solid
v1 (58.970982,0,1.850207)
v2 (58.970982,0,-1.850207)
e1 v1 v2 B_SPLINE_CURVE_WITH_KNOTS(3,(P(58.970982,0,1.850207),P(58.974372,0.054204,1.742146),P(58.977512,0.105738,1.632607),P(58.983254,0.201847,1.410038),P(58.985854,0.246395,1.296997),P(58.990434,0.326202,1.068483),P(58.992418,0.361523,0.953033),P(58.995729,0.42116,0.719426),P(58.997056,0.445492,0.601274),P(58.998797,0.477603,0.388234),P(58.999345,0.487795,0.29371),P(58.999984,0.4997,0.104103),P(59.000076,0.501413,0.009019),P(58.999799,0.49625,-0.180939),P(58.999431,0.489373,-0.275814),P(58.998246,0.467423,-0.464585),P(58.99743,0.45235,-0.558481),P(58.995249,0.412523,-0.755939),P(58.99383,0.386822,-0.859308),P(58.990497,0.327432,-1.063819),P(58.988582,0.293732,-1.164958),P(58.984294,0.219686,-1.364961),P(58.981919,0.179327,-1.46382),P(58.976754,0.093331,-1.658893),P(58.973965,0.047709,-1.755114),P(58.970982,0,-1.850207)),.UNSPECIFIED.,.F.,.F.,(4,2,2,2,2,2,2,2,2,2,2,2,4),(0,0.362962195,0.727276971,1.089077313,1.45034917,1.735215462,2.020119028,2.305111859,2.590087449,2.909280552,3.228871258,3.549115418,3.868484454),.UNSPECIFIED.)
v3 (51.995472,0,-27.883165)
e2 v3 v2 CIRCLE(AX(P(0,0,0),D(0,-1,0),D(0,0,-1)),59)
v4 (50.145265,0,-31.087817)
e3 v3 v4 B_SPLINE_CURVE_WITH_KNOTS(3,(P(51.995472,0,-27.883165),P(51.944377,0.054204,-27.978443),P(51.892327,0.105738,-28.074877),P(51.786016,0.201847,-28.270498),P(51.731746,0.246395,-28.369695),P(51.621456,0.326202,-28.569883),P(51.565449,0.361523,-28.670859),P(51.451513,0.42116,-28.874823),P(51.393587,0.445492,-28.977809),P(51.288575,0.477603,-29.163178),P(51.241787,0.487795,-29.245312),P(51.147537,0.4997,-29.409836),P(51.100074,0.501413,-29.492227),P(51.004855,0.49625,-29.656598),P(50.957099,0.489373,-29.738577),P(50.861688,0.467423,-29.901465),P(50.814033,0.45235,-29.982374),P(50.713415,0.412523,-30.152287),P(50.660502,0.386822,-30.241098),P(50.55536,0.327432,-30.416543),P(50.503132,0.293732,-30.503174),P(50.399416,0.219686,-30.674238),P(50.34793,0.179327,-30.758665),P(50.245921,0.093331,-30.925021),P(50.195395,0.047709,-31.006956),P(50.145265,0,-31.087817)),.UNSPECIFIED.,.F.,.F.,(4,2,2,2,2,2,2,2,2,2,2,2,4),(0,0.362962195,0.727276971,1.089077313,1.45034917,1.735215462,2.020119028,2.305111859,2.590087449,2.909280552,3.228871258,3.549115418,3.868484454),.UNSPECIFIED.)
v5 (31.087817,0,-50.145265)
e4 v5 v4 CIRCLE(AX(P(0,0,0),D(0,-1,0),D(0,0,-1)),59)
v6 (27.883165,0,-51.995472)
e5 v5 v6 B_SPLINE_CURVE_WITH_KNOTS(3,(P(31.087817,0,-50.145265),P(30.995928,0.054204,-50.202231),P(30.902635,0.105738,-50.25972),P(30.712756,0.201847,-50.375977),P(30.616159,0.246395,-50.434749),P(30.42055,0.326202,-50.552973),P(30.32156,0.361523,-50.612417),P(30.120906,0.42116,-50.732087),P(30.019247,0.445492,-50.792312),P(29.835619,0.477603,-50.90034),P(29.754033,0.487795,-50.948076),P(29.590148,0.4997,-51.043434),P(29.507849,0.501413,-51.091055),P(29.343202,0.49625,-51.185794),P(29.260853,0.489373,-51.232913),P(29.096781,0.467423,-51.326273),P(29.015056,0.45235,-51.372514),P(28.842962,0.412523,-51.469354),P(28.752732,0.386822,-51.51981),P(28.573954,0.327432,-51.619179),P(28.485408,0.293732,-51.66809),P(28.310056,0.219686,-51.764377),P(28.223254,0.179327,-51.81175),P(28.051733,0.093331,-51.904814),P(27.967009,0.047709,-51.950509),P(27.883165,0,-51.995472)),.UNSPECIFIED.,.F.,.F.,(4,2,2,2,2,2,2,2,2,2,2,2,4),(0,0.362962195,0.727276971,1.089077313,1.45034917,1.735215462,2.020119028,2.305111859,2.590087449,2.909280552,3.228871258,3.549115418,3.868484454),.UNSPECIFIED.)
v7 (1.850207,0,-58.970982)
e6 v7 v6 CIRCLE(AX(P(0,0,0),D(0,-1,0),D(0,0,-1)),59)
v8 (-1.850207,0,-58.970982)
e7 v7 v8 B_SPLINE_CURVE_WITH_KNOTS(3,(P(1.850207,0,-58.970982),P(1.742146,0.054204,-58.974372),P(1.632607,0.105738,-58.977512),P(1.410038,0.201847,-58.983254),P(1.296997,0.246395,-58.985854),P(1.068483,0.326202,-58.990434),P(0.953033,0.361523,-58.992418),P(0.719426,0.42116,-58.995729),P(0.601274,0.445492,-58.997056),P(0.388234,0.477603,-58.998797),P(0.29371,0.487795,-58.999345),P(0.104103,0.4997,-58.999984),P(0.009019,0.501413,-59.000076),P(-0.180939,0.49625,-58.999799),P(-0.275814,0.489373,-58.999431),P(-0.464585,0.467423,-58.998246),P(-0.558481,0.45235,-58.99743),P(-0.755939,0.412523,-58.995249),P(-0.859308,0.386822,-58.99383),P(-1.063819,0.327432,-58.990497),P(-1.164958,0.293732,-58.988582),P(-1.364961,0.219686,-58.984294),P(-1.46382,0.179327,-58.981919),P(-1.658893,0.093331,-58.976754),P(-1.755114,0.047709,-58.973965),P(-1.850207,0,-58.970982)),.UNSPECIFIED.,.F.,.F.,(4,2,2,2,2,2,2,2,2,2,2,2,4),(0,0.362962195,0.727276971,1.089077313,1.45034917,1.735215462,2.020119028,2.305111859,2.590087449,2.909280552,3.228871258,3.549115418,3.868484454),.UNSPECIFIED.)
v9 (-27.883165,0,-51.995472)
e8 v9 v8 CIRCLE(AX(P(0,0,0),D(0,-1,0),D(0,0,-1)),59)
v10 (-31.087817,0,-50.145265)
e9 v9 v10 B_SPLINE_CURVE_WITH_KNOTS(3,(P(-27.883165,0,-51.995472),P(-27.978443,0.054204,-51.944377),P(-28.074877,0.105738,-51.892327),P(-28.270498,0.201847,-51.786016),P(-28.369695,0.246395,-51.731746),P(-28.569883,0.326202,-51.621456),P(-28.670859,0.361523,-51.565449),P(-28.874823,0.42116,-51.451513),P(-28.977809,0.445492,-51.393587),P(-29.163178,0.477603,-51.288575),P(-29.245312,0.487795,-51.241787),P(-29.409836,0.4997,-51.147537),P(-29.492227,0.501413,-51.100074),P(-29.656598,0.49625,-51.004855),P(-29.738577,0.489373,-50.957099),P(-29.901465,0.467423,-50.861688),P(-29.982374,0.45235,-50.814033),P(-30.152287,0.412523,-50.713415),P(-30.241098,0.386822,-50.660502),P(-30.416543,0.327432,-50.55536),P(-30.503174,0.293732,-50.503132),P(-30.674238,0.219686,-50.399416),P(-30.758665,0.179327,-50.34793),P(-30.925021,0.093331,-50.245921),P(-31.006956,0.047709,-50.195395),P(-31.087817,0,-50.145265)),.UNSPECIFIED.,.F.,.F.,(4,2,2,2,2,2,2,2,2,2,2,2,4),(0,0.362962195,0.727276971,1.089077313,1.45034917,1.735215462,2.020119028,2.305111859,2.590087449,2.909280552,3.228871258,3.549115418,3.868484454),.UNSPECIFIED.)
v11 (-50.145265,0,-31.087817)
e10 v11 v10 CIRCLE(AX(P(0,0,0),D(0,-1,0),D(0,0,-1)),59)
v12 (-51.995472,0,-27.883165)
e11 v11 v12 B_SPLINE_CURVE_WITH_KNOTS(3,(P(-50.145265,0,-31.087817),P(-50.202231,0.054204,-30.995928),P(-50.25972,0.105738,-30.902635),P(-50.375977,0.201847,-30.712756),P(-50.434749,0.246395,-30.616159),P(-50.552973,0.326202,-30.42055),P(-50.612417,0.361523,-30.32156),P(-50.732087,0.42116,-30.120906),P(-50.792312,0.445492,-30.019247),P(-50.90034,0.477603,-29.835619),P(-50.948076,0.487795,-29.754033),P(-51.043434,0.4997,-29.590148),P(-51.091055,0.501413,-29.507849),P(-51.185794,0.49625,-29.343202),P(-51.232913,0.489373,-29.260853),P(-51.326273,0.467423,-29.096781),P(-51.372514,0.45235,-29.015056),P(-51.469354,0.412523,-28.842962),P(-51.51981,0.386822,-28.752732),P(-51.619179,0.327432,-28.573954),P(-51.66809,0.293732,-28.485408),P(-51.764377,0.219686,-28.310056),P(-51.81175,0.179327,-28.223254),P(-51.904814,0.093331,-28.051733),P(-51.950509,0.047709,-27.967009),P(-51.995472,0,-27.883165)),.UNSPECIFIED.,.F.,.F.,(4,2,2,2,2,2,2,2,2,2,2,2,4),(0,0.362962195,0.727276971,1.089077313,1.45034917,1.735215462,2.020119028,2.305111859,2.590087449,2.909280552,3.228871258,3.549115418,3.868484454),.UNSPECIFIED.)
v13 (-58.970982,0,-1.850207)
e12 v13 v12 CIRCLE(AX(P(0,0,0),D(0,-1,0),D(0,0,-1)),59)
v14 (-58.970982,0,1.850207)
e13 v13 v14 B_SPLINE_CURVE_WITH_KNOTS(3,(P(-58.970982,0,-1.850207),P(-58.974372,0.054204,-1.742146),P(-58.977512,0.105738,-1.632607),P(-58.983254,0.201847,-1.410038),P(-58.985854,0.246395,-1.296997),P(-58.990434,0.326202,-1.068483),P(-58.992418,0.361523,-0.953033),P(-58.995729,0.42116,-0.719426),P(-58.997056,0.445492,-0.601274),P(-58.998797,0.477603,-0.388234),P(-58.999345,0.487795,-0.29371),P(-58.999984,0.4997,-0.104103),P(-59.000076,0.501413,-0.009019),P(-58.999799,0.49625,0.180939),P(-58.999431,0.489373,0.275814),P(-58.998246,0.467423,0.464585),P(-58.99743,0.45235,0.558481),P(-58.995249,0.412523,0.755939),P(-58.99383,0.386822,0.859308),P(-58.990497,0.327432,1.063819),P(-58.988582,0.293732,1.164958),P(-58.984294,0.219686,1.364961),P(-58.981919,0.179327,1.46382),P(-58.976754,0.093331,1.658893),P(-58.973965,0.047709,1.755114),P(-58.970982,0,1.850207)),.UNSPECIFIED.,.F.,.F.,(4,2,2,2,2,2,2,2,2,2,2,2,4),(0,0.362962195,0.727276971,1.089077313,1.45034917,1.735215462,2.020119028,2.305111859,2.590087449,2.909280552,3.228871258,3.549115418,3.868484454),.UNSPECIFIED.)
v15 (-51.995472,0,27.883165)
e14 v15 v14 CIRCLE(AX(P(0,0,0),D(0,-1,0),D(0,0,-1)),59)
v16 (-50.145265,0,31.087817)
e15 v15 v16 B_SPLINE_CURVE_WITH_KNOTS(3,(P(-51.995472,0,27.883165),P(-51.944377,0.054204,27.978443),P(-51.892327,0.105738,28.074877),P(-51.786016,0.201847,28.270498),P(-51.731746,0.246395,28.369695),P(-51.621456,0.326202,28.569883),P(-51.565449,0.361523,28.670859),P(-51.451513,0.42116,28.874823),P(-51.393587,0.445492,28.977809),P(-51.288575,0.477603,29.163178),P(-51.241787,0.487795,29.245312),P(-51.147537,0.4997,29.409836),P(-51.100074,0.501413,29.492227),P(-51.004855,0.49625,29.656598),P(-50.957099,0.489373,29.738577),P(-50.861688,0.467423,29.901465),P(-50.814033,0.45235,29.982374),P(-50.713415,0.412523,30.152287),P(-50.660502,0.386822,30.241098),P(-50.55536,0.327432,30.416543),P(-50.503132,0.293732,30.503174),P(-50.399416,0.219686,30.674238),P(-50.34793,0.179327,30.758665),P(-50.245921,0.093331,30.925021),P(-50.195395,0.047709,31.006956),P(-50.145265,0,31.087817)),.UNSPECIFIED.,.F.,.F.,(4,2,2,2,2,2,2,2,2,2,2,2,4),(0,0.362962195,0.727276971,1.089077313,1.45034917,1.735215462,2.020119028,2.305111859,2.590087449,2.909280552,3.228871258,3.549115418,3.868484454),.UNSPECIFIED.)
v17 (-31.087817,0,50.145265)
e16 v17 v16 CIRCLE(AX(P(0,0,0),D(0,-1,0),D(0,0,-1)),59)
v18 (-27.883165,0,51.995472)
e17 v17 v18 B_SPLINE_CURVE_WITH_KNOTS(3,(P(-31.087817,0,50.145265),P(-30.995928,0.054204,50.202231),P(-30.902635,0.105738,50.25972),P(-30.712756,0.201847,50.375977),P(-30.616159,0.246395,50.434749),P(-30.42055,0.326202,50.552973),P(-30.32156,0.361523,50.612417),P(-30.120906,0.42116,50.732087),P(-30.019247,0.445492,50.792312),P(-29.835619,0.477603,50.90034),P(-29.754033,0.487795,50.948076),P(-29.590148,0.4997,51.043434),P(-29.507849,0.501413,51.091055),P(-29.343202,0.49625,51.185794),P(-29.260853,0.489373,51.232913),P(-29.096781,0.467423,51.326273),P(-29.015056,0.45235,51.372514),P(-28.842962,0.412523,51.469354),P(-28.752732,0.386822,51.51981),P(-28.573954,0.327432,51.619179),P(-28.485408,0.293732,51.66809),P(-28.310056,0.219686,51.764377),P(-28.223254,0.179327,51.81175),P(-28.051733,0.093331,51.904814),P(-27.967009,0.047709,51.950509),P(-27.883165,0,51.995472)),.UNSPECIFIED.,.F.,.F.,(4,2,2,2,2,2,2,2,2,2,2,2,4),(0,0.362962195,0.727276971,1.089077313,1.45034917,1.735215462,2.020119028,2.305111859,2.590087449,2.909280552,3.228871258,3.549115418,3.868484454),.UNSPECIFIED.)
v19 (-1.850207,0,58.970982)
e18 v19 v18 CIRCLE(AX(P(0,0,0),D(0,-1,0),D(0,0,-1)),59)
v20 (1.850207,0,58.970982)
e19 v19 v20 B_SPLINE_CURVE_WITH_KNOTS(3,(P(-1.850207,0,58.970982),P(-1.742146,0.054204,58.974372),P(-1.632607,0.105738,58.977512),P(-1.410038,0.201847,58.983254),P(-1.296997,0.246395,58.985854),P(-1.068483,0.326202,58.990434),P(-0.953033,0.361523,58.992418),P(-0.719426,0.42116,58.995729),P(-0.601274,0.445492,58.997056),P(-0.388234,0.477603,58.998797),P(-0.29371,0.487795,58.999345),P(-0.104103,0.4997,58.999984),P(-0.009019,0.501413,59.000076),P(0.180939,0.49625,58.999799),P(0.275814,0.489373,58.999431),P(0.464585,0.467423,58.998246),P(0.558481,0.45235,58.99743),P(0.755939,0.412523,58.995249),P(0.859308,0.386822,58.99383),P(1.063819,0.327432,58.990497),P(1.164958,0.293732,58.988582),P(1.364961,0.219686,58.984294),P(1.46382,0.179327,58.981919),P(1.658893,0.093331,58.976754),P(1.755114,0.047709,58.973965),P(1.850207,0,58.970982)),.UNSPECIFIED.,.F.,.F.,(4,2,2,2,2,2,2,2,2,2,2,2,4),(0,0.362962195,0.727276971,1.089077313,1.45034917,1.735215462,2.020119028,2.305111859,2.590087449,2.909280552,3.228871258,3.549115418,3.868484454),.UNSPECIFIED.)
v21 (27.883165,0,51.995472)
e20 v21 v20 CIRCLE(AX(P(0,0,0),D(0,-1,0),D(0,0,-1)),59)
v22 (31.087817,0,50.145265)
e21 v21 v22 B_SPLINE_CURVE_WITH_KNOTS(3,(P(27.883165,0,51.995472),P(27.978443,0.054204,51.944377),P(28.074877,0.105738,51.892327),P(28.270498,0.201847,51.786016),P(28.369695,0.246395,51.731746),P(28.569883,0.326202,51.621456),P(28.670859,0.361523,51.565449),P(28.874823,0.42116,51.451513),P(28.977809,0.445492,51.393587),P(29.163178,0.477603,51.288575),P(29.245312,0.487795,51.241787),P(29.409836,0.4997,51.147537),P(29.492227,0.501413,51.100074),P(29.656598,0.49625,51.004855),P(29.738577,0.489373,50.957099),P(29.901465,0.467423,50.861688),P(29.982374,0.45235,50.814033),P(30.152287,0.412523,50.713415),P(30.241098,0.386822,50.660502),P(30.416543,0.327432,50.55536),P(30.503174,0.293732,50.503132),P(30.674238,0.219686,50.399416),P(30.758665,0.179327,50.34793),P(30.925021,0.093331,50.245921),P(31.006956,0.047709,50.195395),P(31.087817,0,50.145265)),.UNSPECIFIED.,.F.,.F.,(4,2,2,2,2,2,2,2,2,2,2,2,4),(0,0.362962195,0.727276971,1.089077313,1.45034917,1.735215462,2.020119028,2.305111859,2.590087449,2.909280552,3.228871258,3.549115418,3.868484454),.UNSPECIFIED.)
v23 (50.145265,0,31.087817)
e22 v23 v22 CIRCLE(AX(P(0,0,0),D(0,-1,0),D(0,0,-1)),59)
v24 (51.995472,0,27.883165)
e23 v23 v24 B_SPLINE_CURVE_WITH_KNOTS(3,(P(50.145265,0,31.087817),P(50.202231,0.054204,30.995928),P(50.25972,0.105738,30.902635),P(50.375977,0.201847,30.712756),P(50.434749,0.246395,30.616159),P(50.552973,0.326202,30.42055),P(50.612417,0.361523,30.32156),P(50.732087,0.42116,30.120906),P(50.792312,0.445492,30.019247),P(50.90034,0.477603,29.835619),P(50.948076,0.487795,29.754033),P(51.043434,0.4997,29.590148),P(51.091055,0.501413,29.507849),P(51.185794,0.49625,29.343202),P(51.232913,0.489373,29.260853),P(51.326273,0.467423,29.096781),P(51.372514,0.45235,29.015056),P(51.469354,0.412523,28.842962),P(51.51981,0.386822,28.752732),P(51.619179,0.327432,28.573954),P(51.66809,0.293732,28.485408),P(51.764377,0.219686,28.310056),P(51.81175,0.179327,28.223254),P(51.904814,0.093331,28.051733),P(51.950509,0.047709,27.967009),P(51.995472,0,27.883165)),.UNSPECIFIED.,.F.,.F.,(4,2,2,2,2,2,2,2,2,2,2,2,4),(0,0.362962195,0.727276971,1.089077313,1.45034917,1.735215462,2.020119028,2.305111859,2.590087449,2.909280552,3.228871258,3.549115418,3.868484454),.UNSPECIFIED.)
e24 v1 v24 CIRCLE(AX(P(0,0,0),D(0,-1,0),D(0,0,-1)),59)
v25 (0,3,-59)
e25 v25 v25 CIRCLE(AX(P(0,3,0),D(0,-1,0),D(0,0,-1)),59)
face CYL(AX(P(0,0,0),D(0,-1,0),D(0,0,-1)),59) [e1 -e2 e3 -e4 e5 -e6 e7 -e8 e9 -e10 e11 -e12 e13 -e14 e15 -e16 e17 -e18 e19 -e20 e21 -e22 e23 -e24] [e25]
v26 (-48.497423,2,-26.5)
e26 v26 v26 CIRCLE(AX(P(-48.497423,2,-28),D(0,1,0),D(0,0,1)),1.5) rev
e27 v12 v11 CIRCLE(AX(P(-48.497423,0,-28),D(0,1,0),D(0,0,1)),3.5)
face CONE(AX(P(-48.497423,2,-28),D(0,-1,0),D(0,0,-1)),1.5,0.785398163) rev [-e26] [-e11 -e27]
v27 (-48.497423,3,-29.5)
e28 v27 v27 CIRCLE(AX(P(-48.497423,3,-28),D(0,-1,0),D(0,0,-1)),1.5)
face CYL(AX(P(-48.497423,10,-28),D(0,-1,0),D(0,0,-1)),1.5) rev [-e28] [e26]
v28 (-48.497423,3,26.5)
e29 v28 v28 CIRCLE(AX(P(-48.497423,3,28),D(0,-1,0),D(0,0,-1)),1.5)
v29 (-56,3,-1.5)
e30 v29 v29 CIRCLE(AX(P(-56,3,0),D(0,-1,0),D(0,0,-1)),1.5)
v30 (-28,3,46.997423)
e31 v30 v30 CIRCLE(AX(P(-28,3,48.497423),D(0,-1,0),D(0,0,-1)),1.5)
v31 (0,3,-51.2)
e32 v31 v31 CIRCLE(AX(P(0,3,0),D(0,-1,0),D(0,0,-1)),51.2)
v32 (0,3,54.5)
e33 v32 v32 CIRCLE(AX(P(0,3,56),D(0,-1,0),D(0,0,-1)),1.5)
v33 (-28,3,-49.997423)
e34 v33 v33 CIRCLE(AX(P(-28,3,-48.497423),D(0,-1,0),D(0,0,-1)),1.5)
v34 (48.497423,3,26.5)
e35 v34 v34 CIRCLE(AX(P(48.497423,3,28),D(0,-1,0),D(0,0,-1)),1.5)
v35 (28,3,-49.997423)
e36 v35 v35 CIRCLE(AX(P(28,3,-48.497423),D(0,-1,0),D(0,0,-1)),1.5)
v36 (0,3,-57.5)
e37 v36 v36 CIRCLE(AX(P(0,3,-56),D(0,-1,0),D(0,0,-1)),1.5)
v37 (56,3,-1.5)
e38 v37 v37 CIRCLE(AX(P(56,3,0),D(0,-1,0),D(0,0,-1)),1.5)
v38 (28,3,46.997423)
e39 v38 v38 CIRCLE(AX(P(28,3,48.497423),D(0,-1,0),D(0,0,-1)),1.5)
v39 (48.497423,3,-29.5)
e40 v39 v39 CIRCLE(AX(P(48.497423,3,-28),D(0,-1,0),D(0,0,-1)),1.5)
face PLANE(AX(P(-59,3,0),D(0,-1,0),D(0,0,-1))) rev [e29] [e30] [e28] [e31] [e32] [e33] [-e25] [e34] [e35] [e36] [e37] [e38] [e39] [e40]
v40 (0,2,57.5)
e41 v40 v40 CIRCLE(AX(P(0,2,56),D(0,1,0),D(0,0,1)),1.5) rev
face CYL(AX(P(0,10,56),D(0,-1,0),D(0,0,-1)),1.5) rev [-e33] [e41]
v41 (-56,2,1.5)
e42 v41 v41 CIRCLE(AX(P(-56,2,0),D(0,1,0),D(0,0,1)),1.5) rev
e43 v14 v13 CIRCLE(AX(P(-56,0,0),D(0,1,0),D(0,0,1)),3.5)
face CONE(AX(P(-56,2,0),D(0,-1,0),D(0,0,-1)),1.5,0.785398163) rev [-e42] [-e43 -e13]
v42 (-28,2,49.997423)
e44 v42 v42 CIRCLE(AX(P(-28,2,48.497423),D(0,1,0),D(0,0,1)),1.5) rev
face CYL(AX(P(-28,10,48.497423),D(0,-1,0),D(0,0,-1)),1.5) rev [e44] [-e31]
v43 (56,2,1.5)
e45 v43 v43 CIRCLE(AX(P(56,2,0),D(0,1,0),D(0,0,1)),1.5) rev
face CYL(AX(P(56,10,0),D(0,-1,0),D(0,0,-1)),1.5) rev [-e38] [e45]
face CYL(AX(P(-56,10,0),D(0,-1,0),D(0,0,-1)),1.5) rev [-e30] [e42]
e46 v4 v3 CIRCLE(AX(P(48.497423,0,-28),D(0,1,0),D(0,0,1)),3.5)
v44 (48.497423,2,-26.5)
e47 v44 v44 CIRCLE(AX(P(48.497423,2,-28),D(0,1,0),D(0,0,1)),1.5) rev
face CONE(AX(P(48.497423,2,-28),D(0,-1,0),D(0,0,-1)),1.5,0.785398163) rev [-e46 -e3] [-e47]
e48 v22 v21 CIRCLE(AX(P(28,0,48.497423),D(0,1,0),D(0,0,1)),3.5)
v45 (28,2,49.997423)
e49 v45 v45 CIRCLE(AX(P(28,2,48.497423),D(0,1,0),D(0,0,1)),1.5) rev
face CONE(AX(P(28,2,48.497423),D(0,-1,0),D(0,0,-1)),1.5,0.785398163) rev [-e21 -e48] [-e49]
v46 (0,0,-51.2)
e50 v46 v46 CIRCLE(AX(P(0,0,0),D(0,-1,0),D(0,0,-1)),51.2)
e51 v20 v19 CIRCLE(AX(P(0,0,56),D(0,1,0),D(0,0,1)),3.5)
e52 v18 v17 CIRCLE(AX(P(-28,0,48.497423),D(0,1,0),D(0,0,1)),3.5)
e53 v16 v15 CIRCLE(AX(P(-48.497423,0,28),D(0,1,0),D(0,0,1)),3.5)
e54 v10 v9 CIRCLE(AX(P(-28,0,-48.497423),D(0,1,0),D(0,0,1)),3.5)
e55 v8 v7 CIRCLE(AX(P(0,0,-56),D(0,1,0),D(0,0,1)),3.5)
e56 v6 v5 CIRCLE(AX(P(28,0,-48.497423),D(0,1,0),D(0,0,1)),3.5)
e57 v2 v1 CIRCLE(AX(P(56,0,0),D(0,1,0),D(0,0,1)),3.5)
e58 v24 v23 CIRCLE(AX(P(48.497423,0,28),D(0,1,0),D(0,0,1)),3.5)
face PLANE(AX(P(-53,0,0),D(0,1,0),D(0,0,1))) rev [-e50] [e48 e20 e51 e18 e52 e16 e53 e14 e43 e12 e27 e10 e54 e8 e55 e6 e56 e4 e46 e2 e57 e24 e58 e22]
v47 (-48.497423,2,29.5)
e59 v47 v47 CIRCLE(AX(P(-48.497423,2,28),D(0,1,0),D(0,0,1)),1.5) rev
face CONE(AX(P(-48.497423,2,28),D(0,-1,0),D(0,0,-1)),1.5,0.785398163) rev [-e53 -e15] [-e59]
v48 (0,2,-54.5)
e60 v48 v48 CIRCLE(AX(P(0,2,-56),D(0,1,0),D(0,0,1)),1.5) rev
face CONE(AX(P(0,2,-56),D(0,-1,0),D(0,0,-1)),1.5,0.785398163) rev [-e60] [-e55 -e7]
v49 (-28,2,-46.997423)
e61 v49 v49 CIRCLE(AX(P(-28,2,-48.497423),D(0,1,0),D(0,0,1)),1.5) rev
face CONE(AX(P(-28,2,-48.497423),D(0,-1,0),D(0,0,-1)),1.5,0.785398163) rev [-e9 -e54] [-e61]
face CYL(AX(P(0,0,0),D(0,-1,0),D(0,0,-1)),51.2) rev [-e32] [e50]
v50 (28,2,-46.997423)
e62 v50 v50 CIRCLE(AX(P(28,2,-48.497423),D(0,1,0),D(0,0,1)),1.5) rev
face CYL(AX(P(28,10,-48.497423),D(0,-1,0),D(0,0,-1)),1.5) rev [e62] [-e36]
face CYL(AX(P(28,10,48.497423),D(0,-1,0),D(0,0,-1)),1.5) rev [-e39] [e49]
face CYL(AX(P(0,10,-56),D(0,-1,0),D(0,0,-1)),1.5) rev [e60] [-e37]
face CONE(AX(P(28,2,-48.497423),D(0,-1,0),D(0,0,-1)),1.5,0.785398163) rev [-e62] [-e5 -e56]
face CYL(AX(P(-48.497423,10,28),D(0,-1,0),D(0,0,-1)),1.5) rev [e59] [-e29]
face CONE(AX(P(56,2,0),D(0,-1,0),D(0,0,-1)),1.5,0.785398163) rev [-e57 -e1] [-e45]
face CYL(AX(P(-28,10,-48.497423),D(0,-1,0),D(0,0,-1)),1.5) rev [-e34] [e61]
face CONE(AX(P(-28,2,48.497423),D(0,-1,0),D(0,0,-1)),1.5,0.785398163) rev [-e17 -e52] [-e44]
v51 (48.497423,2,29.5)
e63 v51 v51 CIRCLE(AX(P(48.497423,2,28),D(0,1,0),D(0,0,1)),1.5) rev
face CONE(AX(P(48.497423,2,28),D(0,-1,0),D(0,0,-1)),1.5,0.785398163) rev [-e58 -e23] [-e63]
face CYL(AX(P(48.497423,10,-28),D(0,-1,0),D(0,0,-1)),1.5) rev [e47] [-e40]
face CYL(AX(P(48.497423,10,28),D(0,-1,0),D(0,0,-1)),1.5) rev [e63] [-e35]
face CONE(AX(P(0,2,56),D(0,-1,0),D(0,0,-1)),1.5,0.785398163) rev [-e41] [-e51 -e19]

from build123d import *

# Parameters (mm, degrees)
SKETCH_2_R               = 1.5
CUT_EXTRUDE_1_DEPTH      = 10
PATTERN_CIRCULAR_1_COUNT = 12


with BuildPart() as part:
    # 草图1 → 旋转1 (revolve)
    with BuildSketch(Plane.XY, mode=Mode.PRIVATE) as revolve_1_sk:
        Polygon((-53, 0), (-59, 0), (-59, 3), (-51.2, 3), (-51.2, 0), align=None)
    revolve(revolve_1_sk.sketch.rotate(Axis((0, 0, 0), (0, 1, 0)), 270), axis=Axis((0, 0, 0), (0, 1, 0)))

    # 草图2 → 切除-拉伸1 (cut)
    with BuildSketch(Plane.XZ):
        with Locations(Location((0, 56, 0), (0, 0, 270))):
            Circle(SKETCH_2_R)
    cut_extrude_1 = extrude(amount=-CUT_EXTRUDE_1_DEPTH, mode=Mode.SUBTRACT)

    # 阵列(圆周)1: 切除-拉伸1 ×12 about axis
    pattern_circular_1_axis = Axis((0, 0, 0), (0, 1, 0))
    for i in range(1, PATTERN_CIRCULAR_1_COUNT):
        add(cut_extrude_1.rotate(pattern_circular_1_axis, i * 360 / PATTERN_CIRCULAR_1_COUNT), mode=Mode.SUBTRACT)

    # 圆角1: read off the stored shape, not the designer's step
    # 圆角1: loft between two sections, ruled curve by curve
    fillet_1_from = [
        Edge.make_three_point_arc((28, 2, 46.997422612), (29.5, 2, 48.497422612), (28, 2, 49.997422612)),
        Edge.make_three_point_arc((28, 2, 49.997422612), (26.5, 2, 48.497422612), (28, 2, 46.997422612)),
    ]
    fillet_1_to = [
        Edge.make_three_point_arc((28, 0, 44.997422612), (31.5, 0, 48.497422612), (28, 0, 51.997422612)),
        Edge.make_three_point_arc((28, 0, 51.997422612), (24.5, 0, 48.497422612), (28, 0, 44.997422612)),
    ]
    fillet_1 = Solid(Shell([*[Face.make_surface_from_curves(fillet_1_from[k], fillet_1_to[k]) for k in range(2)], Face(Wire(fillet_1_from)), Face(Wire(fillet_1_to))]))
    add(fillet_1, mode=Mode.SUBTRACT)

    # Fillet 1 2: loft between two sections, ruled curve by curve
    fillet_1_2_from = [
        Edge.make_three_point_arc((48.497422612, 2, 26.5), (49.997422612, 2, 28), (48.497422612, 2, 29.5)),
        Edge.make_three_point_arc((48.497422612, 2, 29.5), (46.997422612, 2, 28), (48.497422612, 2, 26.5)),
    ]
    fillet_1_2_to = [
        Edge.make_three_point_arc((48.497422612, 0, 24.5), (51.997422612, 0, 28), (48.497422612, 0, 31.5)),
        Edge.make_three_point_arc((48.497422612, 0, 31.5), (44.997422612, 0, 28), (48.497422612, 0, 24.5)),
    ]
    fillet_1_2 = Solid(Shell([*[Face.make_surface_from_curves(fillet_1_2_from[k], fillet_1_2_to[k]) for k in range(2)], Face(Wire(fillet_1_2_from)), Face(Wire(fillet_1_2_to))]))
    add(fillet_1_2, mode=Mode.SUBTRACT)

    # Fillet 1 3: loft between two sections, ruled curve by curve
    fillet_1_3_from = [
        Edge.make_three_point_arc((56, 2, -1.5), (57.5, 2, 0), (56, 2, 1.5)),
        Edge.make_three_point_arc((56, 2, 1.5), (54.5, 2, 0), (56, 2, -1.5)),
    ]
    fillet_1_3_to = [
        Edge.make_three_point_arc((56, 0, -3.5), (59.5, 0, 0), (56, 0, 3.5)),
        Edge.make_three_point_arc((56, 0, 3.5), (52.5, 0, 0), (56, 0, -3.5)),
    ]
    fillet_1_3 = Solid(Shell([*[Face.make_surface_from_curves(fillet_1_3_from[k], fillet_1_3_to[k]) for k in range(2)], Face(Wire(fillet_1_3_from)), Face(Wire(fillet_1_3_to))]))
    add(fillet_1_3, mode=Mode.SUBTRACT)

    # Fillet 1 4: loft between two sections, ruled curve by curve
    fillet_1_4_from = [
        Edge.make_three_point_arc((48.497422612, 2, -29.5), (49.997422612, 2, -28), (48.497422612, 2, -26.5)),
        Edge.make_three_point_arc((48.497422612, 2, -26.5), (46.997422612, 2, -28), (48.497422612, 2, -29.5)),
    ]
    fillet_1_4_to = [
        Edge.make_three_point_arc((48.497422612, 0, -31.5), (51.997422612, 0, -28), (48.497422612, 0, -24.5)),
        Edge.make_three_point_arc((48.497422612, 0, -24.5), (44.997422612, 0, -28), (48.497422612, 0, -31.5)),
    ]
    fillet_1_4 = Solid(Shell([*[Face.make_surface_from_curves(fillet_1_4_from[k], fillet_1_4_to[k]) for k in range(2)], Face(Wire(fillet_1_4_from)), Face(Wire(fillet_1_4_to))]))
    add(fillet_1_4, mode=Mode.SUBTRACT)

    # Fillet 1 5: loft between two sections, ruled curve by curve
    fillet_1_5_from = [
        Edge.make_three_point_arc((28, 2, -49.997422612), (29.5, 2, -48.497422612), (28, 2, -46.997422612)),
        Edge.make_three_point_arc((28, 2, -46.997422612), (26.5, 2, -48.497422612), (28, 2, -49.997422612)),
    ]
    fillet_1_5_to = [
        Edge.make_three_point_arc((28, 0, -51.997422612), (31.5, 0, -48.497422612), (28, 0, -44.997422612)),
        Edge.make_three_point_arc((28, 0, -44.997422612), (24.5, 0, -48.497422612), (28, 0, -51.997422612)),
    ]
    fillet_1_5 = Solid(Shell([*[Face.make_surface_from_curves(fillet_1_5_from[k], fillet_1_5_to[k]) for k in range(2)], Face(Wire(fillet_1_5_from)), Face(Wire(fillet_1_5_to))]))
    add(fillet_1_5, mode=Mode.SUBTRACT)

    # Fillet 1 6: loft between two sections, ruled curve by curve
    fillet_1_6_from = [
        Edge.make_three_point_arc((0, 2, -57.5), (1.5, 2, -56), (0, 2, -54.5)),
        Edge.make_three_point_arc((0, 2, -54.5), (-1.5, 2, -56), (0, 2, -57.5)),
    ]
    fillet_1_6_to = [
        Edge.make_three_point_arc((0, 0, -59.5), (3.5, 0, -56), (0, 0, -52.5)),
        Edge.make_three_point_arc((0, 0, -52.5), (-3.5, 0, -56), (0, 0, -59.5)),
    ]
    fillet_1_6 = Solid(Shell([*[Face.make_surface_from_curves(fillet_1_6_from[k], fillet_1_6_to[k]) for k in range(2)], Face(Wire(fillet_1_6_from)), Face(Wire(fillet_1_6_to))]))
    add(fillet_1_6, mode=Mode.SUBTRACT)

    # Fillet 1 7: loft between two sections, ruled curve by curve
    fillet_1_7_from = [
        Edge.make_three_point_arc((-28, 2, -49.997422612), (-26.5, 2, -48.497422612), (-28, 2, -46.997422612)),
        Edge.make_three_point_arc((-28, 2, -46.997422612), (-29.5, 2, -48.497422612), (-28, 2, -49.997422612)),
    ]
    fillet_1_7_to = [
        Edge.make_three_point_arc((-28, 0, -51.997422612), (-24.5, 0, -48.497422612), (-28, 0, -44.997422612)),
        Edge.make_three_point_arc((-28, 0, -44.997422612), (-31.5, 0, -48.497422612), (-28, 0, -51.997422612)),
    ]
    fillet_1_7 = Solid(Shell([*[Face.make_surface_from_curves(fillet_1_7_from[k], fillet_1_7_to[k]) for k in range(2)], Face(Wire(fillet_1_7_from)), Face(Wire(fillet_1_7_to))]))
    add(fillet_1_7, mode=Mode.SUBTRACT)

    # Fillet 1 8: loft between two sections, ruled curve by curve
    fillet_1_8_from = [
        Edge.make_three_point_arc((-48.497422612, 2, -29.5), (-46.997422612, 2, -28), (-48.497422612, 2, -26.5)),
        Edge.make_three_point_arc((-48.497422612, 2, -26.5), (-49.997422612, 2, -28), (-48.497422612, 2, -29.5)),
    ]
    fillet_1_8_to = [
        Edge.make_three_point_arc((-48.497422612, 0, -31.5), (-44.997422612, 0, -28), (-48.497422612, 0, -24.5)),
        Edge.make_three_point_arc((-48.497422612, 0, -24.5), (-51.997422612, 0, -28), (-48.497422612, 0, -31.5)),
    ]
    fillet_1_8 = Solid(Shell([*[Face.make_surface_from_curves(fillet_1_8_from[k], fillet_1_8_to[k]) for k in range(2)], Face(Wire(fillet_1_8_from)), Face(Wire(fillet_1_8_to))]))
    add(fillet_1_8, mode=Mode.SUBTRACT)

    # Fillet 1 9: loft between two sections, ruled curve by curve
    fillet_1_9_from = [
        Edge.make_three_point_arc((-56, 2, -1.5), (-54.5, 2, 0), (-56, 2, 1.5)),
        Edge.make_three_point_arc((-56, 2, 1.5), (-57.5, 2, 0), (-56, 2, -1.5)),
    ]
    fillet_1_9_to = [
        Edge.make_three_point_arc((-56, 0, -3.5), (-52.5, 0, 0), (-56, 0, 3.5)),
        Edge.make_three_point_arc((-56, 0, 3.5), (-59.5, 0, 0), (-56, 0, -3.5)),
    ]
    fillet_1_9 = Solid(Shell([*[Face.make_surface_from_curves(fillet_1_9_from[k], fillet_1_9_to[k]) for k in range(2)], Face(Wire(fillet_1_9_from)), Face(Wire(fillet_1_9_to))]))
    add(fillet_1_9, mode=Mode.SUBTRACT)

    # Fillet 1 10: loft between two sections, ruled curve by curve
    fillet_1_10_from = [
        Edge.make_three_point_arc((-48.497422612, 2, 26.5), (-46.997422612, 2, 28), (-48.497422612, 2, 29.5)),
        Edge.make_three_point_arc((-48.497422612, 2, 29.5), (-49.997422612, 2, 28), (-48.497422612, 2, 26.5)),
    ]
    fillet_1_10_to = [
        Edge.make_three_point_arc((-48.497422612, 0, 24.5), (-44.997422612, 0, 28), (-48.497422612, 0, 31.5)),
        Edge.make_three_point_arc((-48.497422612, 0, 31.5), (-51.997422612, 0, 28), (-48.497422612, 0, 24.5)),
    ]
    fillet_1_10 = Solid(Shell([*[Face.make_surface_from_curves(fillet_1_10_from[k], fillet_1_10_to[k]) for k in range(2)], Face(Wire(fillet_1_10_from)), Face(Wire(fillet_1_10_to))]))
    add(fillet_1_10, mode=Mode.SUBTRACT)

    # Fillet 1 11: loft between two sections, ruled curve by curve
    fillet_1_11_from = [
        Edge.make_three_point_arc((-28, 2, 46.997422612), (-26.5, 2, 48.497422612), (-28, 2, 49.997422612)),
        Edge.make_three_point_arc((-28, 2, 49.997422612), (-29.5, 2, 48.497422612), (-28, 2, 46.997422612)),
    ]
    fillet_1_11_to = [
        Edge.make_three_point_arc((-28, 0, 44.997422612), (-24.5, 0, 48.497422612), (-28, 0, 51.997422612)),
        Edge.make_three_point_arc((-28, 0, 51.997422612), (-31.5, 0, 48.497422612), (-28, 0, 44.997422612)),
    ]
    fillet_1_11 = Solid(Shell([*[Face.make_surface_from_curves(fillet_1_11_from[k], fillet_1_11_to[k]) for k in range(2)], Face(Wire(fillet_1_11_from)), Face(Wire(fillet_1_11_to))]))
    add(fillet_1_11, mode=Mode.SUBTRACT)

    # Fillet 1 12: loft between two sections, ruled curve by curve
    fillet_1_12_from = [
        Edge.make_three_point_arc((0, 2, 54.5), (1.5, 2, 56), (0, 2, 57.5)),
        Edge.make_three_point_arc((0, 2, 57.5), (-1.5, 2, 56), (0, 2, 54.5)),
    ]
    fillet_1_12_to = [
        Edge.make_three_point_arc((0, 0, 52.5), (3.5, 0, 56), (0, 0, 59.5)),
        Edge.make_three_point_arc((0, 0, 59.5), (-3.5, 0, 56), (0, 0, 52.5)),
    ]
    fillet_1_12 = Solid(Shell([*[Face.make_surface_from_curves(fillet_1_12_from[k], fillet_1_12_to[k]) for k in range(2)], Face(Wire(fillet_1_12_from)), Face(Wire(fillet_1_12_to))]))
    add(fillet_1_12, mode=Mode.SUBTRACT)


solid = part.part
